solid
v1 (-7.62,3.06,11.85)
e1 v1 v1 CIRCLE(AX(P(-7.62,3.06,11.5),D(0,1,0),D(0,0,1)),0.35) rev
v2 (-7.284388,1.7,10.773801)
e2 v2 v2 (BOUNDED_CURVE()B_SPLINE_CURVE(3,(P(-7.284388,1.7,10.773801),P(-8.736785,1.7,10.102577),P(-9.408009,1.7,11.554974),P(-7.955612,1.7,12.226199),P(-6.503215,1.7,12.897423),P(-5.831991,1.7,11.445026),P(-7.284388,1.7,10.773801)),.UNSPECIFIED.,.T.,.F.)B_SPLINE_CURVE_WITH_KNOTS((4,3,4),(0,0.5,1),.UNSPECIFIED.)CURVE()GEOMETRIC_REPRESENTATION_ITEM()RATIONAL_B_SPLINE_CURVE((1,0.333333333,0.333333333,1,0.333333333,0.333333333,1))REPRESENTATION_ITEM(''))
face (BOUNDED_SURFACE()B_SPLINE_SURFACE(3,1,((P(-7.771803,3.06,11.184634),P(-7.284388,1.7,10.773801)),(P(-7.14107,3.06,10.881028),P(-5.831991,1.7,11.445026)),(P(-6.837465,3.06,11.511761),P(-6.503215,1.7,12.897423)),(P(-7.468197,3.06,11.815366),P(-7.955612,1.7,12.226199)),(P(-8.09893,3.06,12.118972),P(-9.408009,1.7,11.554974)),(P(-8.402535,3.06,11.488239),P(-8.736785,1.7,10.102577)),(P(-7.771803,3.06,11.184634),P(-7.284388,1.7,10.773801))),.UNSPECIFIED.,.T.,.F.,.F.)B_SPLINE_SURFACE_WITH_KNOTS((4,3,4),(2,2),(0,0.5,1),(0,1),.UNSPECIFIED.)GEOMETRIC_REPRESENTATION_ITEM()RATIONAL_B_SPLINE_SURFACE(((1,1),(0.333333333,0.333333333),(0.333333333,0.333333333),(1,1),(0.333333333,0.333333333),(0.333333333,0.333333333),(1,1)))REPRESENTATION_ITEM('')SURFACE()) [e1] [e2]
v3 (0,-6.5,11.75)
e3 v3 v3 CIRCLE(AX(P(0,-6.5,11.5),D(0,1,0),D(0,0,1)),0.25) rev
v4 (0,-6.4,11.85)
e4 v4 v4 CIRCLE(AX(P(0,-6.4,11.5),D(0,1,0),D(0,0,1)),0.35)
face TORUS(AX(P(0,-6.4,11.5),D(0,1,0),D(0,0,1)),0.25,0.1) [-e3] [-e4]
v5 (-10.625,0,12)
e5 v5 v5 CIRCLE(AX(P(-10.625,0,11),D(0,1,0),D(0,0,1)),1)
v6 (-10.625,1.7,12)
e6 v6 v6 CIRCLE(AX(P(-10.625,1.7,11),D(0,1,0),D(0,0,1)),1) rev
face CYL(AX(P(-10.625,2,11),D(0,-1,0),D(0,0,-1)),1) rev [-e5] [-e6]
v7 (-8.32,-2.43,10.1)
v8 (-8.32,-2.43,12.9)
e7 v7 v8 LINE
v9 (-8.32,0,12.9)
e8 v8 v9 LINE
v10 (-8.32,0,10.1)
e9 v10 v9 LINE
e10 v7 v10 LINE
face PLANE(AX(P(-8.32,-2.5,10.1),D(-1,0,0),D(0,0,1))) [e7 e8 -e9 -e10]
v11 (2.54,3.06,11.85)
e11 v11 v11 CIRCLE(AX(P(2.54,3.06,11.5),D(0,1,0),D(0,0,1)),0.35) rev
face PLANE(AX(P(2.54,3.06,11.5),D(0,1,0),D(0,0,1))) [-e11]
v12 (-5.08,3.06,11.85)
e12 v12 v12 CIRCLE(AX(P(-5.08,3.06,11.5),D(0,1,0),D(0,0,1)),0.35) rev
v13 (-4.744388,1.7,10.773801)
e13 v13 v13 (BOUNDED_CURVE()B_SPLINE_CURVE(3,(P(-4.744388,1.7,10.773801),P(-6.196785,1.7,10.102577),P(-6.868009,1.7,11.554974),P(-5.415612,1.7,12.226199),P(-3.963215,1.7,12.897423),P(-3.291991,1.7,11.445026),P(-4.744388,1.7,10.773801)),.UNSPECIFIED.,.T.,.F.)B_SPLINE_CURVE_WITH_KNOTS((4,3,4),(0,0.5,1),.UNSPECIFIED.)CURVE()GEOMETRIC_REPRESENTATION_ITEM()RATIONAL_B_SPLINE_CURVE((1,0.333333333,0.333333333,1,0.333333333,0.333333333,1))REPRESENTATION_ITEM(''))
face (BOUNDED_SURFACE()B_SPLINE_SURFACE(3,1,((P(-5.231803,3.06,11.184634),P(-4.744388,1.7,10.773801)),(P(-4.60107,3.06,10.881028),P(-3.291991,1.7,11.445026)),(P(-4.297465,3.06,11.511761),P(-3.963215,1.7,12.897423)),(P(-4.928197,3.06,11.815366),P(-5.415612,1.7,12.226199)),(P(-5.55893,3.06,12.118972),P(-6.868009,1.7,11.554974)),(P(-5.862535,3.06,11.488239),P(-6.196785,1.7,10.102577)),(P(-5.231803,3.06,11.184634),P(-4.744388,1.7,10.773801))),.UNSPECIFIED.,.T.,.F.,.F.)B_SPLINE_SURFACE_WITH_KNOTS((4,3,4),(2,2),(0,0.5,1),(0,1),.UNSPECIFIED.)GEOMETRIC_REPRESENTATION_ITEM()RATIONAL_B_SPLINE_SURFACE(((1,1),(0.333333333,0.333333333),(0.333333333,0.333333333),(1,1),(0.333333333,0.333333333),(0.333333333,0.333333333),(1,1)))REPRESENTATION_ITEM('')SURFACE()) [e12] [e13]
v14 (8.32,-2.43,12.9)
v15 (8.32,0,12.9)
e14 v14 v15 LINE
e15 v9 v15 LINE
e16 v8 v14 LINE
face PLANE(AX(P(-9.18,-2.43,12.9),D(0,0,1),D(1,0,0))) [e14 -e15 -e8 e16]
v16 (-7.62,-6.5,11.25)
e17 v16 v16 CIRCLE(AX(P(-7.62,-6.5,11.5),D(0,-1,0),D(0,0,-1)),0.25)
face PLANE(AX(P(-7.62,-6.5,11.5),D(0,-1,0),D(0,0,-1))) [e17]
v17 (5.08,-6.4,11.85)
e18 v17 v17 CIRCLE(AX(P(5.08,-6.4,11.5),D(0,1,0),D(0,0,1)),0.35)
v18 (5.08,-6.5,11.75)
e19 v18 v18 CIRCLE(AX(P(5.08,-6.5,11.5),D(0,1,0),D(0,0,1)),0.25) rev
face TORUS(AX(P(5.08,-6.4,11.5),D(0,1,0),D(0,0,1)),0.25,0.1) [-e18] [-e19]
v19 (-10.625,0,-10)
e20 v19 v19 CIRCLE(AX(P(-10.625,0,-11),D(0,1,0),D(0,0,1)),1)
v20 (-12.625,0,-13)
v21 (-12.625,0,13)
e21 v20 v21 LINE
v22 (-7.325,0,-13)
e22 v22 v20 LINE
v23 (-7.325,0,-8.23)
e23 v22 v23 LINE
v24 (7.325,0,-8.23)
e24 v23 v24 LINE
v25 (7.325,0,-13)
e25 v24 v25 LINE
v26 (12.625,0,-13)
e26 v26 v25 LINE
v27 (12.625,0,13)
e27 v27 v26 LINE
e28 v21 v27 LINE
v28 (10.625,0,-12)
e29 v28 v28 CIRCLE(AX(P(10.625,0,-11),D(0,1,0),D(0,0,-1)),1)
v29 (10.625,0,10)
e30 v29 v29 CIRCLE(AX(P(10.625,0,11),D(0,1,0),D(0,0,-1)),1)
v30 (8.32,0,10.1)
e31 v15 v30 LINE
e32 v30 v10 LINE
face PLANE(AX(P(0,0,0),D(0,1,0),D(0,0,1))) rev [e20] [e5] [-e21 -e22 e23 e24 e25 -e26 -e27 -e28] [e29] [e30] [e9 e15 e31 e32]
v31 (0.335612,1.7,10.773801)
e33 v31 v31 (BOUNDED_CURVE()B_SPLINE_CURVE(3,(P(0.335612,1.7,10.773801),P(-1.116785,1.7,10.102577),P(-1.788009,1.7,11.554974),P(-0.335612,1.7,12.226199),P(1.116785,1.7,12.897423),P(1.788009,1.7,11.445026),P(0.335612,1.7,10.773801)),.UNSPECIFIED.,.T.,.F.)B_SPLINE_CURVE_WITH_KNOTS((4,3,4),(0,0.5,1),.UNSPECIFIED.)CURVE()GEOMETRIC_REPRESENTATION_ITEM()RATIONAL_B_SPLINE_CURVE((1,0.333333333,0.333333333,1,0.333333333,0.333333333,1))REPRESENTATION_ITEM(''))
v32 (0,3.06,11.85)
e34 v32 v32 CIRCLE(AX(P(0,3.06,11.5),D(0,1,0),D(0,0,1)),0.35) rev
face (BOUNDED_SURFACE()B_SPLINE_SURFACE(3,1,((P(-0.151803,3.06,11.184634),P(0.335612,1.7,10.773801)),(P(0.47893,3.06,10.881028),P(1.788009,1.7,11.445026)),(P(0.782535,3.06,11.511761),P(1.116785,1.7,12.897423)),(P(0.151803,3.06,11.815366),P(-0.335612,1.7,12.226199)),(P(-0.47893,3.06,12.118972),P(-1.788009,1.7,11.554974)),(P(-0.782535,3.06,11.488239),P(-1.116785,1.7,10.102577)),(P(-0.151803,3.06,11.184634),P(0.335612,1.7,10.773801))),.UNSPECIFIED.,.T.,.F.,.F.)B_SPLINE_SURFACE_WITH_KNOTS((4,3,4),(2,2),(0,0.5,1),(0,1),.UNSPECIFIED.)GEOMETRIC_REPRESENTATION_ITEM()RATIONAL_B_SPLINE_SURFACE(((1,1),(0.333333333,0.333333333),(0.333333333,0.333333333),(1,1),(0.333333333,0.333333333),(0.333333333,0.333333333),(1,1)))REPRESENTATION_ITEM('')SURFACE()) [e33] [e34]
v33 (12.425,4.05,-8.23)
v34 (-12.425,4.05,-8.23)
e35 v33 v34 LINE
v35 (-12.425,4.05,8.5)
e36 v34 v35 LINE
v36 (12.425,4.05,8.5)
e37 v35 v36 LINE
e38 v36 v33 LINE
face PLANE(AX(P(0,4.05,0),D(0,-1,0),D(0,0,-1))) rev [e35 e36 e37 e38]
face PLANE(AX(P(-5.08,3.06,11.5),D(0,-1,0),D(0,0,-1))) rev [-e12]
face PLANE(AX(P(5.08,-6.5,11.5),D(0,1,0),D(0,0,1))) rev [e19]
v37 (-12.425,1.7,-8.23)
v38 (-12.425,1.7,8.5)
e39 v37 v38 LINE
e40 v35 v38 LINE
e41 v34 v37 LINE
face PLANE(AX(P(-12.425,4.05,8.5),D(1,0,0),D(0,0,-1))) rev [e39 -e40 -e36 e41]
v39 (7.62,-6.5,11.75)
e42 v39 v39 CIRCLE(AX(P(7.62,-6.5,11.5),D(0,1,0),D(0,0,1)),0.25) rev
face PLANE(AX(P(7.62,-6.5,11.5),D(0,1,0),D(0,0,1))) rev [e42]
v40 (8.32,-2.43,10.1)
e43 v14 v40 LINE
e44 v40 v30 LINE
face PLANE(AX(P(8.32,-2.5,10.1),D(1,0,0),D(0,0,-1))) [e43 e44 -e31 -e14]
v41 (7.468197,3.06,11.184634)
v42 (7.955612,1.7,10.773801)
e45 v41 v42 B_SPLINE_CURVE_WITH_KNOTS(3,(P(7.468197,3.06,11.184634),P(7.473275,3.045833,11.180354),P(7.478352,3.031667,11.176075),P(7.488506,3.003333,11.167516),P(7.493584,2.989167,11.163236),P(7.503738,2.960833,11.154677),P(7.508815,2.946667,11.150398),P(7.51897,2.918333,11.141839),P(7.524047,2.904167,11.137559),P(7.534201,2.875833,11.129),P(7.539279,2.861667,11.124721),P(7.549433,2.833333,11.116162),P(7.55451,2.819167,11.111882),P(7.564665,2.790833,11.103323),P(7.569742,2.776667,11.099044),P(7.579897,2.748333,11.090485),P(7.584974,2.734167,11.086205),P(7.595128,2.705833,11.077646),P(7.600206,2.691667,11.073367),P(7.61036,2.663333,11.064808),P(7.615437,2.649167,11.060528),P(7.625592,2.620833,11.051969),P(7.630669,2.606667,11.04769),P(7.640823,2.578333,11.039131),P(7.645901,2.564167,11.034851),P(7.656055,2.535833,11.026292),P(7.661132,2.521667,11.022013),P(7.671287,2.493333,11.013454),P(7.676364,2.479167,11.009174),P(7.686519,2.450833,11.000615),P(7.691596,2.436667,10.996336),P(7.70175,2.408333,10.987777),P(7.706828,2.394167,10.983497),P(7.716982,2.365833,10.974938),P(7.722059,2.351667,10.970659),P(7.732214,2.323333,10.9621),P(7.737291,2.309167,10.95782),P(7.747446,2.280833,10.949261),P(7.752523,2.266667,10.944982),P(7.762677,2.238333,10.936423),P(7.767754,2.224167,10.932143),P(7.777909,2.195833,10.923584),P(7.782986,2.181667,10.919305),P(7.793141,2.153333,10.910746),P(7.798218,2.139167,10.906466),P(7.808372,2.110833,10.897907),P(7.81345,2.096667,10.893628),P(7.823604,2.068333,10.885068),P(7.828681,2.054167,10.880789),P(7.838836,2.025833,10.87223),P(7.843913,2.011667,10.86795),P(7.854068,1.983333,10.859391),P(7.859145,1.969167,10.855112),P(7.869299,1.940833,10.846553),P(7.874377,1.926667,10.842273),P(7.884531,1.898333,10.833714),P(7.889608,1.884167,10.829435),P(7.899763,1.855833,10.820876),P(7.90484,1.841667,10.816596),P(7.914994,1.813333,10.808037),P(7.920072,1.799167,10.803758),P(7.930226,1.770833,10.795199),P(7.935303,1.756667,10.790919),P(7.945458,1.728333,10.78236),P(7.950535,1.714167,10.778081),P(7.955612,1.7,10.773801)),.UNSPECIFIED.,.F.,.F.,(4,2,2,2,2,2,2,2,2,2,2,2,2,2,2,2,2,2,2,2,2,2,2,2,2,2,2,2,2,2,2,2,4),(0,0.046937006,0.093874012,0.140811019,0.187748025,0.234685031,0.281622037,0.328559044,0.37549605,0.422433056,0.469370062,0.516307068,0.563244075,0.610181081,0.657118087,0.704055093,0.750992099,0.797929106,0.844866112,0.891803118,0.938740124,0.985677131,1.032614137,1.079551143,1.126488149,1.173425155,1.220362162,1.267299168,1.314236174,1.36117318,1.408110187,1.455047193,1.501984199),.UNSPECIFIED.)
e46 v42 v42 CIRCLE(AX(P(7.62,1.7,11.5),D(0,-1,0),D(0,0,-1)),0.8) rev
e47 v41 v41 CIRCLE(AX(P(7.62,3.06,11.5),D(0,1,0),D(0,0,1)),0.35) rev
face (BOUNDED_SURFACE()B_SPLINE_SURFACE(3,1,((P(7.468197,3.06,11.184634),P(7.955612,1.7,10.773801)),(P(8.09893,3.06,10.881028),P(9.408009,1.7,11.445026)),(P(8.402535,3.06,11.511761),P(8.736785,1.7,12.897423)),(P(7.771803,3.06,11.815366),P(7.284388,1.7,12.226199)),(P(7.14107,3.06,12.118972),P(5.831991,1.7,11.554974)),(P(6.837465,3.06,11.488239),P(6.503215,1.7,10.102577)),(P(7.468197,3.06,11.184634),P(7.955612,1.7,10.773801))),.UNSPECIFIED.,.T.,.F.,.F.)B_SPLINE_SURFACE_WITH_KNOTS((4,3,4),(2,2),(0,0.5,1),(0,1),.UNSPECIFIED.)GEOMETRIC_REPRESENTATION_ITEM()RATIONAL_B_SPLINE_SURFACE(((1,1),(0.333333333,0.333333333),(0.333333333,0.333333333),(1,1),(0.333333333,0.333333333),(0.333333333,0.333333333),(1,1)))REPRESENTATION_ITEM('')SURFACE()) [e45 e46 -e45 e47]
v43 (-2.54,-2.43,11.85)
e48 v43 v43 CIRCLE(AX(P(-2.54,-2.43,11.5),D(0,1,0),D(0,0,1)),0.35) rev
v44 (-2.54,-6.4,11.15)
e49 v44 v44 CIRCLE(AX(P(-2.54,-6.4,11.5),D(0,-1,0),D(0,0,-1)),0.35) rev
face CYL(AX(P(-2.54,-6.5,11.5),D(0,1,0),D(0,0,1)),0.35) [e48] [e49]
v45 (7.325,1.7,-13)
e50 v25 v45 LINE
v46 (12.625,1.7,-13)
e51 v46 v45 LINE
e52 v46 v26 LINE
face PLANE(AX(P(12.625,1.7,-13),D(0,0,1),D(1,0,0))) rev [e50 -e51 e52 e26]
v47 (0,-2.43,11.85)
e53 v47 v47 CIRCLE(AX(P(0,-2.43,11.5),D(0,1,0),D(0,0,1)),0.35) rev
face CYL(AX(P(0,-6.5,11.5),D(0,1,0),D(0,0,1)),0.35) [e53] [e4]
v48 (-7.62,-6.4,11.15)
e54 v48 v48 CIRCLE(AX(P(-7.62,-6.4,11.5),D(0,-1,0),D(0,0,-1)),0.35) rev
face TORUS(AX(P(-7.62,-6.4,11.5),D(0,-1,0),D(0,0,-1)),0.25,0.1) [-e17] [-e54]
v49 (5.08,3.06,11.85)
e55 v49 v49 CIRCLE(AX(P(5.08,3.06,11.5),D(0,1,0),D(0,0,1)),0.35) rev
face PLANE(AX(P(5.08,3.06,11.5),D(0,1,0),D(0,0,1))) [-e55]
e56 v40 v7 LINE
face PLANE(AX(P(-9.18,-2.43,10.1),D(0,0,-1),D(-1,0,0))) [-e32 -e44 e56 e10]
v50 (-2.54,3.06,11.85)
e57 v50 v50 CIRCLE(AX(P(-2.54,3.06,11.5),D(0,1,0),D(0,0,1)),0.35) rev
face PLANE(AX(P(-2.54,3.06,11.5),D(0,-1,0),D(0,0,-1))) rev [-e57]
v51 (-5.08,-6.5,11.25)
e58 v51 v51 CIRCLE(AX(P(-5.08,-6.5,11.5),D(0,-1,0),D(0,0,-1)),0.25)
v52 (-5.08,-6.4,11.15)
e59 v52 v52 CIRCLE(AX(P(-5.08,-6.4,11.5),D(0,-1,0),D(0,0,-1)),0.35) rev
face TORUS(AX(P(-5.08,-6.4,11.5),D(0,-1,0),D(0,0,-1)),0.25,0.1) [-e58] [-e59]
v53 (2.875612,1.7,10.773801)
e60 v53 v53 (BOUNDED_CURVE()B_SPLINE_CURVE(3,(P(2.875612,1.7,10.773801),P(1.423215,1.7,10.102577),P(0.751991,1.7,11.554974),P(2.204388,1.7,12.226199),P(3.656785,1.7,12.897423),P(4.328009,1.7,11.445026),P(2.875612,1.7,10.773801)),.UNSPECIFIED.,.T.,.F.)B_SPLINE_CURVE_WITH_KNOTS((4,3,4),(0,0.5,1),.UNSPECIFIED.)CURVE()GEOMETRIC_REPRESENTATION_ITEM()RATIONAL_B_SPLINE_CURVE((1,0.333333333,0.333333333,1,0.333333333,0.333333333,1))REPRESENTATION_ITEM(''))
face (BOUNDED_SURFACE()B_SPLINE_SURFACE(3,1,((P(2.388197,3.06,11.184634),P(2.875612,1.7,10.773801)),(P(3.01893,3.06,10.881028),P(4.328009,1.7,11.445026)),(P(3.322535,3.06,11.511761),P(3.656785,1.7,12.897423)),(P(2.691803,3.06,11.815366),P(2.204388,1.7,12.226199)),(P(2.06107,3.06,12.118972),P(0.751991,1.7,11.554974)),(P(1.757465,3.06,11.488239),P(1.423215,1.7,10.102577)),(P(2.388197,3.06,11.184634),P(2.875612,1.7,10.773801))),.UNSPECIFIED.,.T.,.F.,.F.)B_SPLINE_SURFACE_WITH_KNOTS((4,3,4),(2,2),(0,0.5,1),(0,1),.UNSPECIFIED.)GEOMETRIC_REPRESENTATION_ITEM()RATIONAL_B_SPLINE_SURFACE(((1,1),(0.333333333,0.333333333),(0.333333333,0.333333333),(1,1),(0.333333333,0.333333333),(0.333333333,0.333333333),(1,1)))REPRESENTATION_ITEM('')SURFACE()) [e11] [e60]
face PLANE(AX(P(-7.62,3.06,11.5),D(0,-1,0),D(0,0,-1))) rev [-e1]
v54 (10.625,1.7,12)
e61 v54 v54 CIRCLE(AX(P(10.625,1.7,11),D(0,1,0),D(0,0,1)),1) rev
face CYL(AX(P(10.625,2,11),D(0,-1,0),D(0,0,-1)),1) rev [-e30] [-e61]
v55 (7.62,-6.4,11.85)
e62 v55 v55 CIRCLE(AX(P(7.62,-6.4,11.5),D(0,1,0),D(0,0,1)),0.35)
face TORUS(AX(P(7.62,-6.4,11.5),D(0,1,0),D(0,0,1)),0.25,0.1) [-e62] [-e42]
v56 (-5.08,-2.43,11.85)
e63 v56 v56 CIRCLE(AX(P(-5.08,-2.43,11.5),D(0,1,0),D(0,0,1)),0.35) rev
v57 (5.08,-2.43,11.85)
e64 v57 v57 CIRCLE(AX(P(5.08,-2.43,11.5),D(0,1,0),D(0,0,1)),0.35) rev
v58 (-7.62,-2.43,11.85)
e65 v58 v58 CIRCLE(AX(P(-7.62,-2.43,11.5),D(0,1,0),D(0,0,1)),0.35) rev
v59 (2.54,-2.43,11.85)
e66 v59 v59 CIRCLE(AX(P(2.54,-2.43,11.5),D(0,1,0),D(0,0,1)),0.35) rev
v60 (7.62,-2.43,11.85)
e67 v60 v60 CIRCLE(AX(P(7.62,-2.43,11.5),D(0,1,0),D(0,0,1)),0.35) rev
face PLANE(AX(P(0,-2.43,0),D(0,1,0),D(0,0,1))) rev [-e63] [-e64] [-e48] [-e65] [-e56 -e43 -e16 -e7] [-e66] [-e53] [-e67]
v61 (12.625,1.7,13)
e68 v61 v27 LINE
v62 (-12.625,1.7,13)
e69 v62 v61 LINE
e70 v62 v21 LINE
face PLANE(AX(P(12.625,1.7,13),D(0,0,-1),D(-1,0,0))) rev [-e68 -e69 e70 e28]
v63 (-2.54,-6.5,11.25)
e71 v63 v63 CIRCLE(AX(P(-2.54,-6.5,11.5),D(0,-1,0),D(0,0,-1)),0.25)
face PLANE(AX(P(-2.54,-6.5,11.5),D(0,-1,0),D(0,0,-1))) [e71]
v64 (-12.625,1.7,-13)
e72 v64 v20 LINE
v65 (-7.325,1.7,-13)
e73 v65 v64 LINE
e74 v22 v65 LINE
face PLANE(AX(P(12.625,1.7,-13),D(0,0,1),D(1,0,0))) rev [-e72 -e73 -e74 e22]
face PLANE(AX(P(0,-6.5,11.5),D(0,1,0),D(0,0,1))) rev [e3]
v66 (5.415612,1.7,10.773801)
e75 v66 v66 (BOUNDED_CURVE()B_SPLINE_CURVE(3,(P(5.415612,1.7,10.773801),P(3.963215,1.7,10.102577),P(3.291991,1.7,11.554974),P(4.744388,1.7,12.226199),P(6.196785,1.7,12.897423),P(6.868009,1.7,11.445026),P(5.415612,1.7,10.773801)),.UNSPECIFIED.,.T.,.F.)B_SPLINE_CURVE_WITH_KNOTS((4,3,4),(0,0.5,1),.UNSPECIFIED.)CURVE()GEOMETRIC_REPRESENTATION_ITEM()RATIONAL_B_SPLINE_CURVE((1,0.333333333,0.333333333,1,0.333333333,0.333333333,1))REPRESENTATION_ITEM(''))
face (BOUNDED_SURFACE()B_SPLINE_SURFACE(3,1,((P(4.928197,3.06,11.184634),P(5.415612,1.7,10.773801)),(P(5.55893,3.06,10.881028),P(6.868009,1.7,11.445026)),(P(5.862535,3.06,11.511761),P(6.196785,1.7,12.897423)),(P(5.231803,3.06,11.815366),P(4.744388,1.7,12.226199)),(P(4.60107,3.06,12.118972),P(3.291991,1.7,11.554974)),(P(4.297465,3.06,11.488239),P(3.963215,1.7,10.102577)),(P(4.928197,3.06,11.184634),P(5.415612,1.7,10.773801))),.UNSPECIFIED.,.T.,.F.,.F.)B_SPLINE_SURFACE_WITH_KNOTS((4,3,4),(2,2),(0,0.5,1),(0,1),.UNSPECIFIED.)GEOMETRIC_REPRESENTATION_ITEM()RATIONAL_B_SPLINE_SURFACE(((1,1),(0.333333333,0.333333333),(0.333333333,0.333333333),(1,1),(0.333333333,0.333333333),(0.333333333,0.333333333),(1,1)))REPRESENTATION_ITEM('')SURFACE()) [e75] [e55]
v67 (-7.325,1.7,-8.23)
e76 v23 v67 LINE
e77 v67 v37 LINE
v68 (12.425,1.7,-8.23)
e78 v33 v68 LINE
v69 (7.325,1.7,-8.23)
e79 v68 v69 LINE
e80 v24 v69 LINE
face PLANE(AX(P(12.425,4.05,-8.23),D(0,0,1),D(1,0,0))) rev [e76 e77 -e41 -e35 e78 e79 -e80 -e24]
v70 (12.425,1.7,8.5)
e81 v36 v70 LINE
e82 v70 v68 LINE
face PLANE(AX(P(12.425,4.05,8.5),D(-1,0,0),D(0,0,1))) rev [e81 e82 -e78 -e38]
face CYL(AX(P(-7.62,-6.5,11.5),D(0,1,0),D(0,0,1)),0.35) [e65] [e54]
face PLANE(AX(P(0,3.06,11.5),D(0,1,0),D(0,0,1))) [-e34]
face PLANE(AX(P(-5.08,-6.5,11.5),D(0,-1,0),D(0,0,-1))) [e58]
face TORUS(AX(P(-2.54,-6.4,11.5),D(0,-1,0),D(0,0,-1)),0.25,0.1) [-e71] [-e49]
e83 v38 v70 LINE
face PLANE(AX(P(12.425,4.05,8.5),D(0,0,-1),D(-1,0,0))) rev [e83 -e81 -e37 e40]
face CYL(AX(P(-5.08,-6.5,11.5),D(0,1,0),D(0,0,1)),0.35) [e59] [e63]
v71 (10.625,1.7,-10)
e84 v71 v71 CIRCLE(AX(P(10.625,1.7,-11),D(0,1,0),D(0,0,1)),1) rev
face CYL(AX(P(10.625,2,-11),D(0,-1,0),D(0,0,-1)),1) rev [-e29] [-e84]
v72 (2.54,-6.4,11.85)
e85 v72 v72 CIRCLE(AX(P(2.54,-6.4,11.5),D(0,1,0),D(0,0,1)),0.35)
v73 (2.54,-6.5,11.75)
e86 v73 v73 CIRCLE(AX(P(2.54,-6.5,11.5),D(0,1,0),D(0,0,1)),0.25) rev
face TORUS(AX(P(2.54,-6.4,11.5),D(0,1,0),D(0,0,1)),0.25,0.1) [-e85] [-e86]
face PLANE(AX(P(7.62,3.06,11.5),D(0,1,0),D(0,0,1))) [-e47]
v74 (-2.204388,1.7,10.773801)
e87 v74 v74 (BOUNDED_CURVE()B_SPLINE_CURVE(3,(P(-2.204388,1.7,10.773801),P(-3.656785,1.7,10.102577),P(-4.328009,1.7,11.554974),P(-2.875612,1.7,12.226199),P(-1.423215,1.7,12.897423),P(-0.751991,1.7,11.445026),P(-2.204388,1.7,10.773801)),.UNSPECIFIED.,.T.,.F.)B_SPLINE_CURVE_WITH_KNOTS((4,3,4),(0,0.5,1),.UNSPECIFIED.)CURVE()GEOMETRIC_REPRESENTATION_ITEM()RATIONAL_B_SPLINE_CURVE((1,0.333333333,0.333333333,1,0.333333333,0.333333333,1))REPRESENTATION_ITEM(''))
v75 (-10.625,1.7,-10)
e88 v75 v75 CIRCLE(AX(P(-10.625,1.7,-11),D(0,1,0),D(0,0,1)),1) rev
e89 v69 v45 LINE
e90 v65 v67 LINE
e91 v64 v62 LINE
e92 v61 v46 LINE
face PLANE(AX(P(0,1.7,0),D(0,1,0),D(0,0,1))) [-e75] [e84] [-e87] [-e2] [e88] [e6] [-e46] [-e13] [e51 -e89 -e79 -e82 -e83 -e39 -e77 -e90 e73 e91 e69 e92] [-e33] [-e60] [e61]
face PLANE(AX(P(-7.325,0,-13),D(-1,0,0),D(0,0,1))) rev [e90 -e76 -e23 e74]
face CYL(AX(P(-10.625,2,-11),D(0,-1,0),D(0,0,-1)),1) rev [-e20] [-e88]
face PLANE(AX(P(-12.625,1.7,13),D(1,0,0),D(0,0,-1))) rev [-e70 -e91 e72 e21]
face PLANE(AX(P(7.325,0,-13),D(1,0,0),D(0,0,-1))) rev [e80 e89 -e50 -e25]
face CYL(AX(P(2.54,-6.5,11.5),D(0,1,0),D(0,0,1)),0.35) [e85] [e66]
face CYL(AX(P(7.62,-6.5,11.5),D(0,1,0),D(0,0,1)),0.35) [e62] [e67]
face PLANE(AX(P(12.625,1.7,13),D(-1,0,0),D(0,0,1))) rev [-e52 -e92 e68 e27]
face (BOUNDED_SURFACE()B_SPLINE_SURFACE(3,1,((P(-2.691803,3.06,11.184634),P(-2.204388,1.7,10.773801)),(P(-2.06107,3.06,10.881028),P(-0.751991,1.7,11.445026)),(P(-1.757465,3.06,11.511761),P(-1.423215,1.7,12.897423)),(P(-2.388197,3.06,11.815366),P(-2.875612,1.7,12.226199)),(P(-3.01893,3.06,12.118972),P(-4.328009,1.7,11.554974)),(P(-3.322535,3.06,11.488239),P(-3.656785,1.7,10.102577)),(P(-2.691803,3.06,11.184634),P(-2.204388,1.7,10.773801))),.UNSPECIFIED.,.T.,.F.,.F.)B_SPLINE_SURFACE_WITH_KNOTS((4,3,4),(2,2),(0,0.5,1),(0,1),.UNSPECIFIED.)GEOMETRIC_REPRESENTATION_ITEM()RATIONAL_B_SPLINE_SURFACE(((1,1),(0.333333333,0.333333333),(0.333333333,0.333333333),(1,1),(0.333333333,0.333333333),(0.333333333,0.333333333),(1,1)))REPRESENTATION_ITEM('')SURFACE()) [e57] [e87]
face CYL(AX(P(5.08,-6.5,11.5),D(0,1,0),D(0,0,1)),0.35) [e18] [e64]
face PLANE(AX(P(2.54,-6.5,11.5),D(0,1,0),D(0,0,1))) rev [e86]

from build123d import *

# Parameters (mm, degrees)
SKETCH_1_W             = 25.25
SKETCH_1_H             = 26
EXTRUDE_1_DEPTH        = 1.7
SKETCH_3_R             = 1
CUT_EXTRUDE_3_DEPTH    = 2
SKETCH_7_W             = 24.85
SKETCH_7_H             = 16.73
EXTRUDE_4_DEPTH        = 2.35
SKETCH_9_W             = 14.65
SKETCH_9_H             = 4.77
CUT_EXTRUDE_5_DEPTH    = 1.7
EXTRUDE_5_DEPTH        = 1.36
EXTRUDE_5_DEPTH_BACK   = 8.2
SKETCH_10_R            = 0.35
PATTERN_LINEAR_1_COUNT = 7
PATTERN_LINEAR_1_PITCH = 2.54
SKETCH_13_W            = 18.36
SKETCH_13_H            = 2.8
EXTRUDE_6_DEPTH        = 2.43
FILLET_2_R             = 0.5
FILLET_3_R             = 0.1
SKETCH_14_W            = 0.86
SKETCH_14_H            = 2.8
CUT_EXTRUDE_6_DEPTH    = 2.5


with BuildPart() as part:
    # 草图1 → 凸台-拉伸1 (new body)
    with BuildSketch(Plane(origin=(0, 0, 0), x_dir=(1, 0, 0), z_dir=(0, 1, 0))):
        Rectangle(SKETCH_1_W, SKETCH_1_H)
    extrude(amount=EXTRUDE_1_DEPTH)

    # 草图3 → 切除-拉伸3 (cut)
    with BuildSketch(Plane(origin=(0, 0, 0), x_dir=(1, 0, 0), z_dir=(0, 1, 0))):
        with Locations(Location((-10.625, -11, 0), (0, 0, 270))):
            Circle(SKETCH_3_R)
        with Locations(Location((10.625, -11, 0), (0, 0, 90))):
            Circle(SKETCH_3_R)
        with Locations(Location((-10.625, 11, 0), (0, 0, 270))):
            Circle(SKETCH_3_R)
        with Locations(Location((10.625, 11, 0), (0, 0, 90))):
            Circle(SKETCH_3_R)
    extrude(amount=CUT_EXTRUDE_3_DEPTH, mode=Mode.SUBTRACT)

    # 草图7 → 凸台-拉伸4 (add)
    with BuildSketch(Plane(origin=(0, 1.7, 0), x_dir=(1, 0, 0), z_dir=(0, 1, 0))):
        with Locations((0, -0.135)):
            Rectangle(SKETCH_7_W, SKETCH_7_H)
    extrude(amount=EXTRUDE_4_DEPTH)

    # 草图9 → 切除-拉伸5 (cut)
    with BuildSketch(Plane(origin=(0, 1.7, 0), x_dir=(1, 0, 0), z_dir=(0, 1, 0))):
        with Locations((0, 10.615)):
            Rectangle(SKETCH_9_W, SKETCH_9_H)
    extrude(amount=-CUT_EXTRUDE_5_DEPTH, mode=Mode.SUBTRACT)

    # 草图10 → 凸台-拉伸5 (add, two sides: drawn at the far end of the back side and taken through both)
    with BuildSketch(Plane(origin=(0, 1.7, 0), x_dir=(1, 0, 0), z_dir=(0, 1, 0)).offset(-EXTRUDE_5_DEPTH_BACK)):
        with Locations(Location((0, -11.5, 0), (0, 0, 270))):
            Circle(SKETCH_10_R)
        with Locations(Location((2.54, -11.5, 0), (0, 0, 270))):
            Circle(SKETCH_10_R)
        with Locations(Location((5.08, -11.5, 0), (0, 0, 270))):
            Circle(SKETCH_10_R)
        with Locations(Location((7.62, -11.5, 0), (0, 0, 270))):
            Circle(SKETCH_10_R)
        with Locations(Location((-2.54, -11.5, 0), (0, 0, 270))):
            Circle(SKETCH_10_R)
        with Locations(Location((-5.08, -11.5, 0), (0, 0, 270))):
            Circle(SKETCH_10_R)
        with Locations(Location((-7.62, -11.5, 0), (0, 0, 270))):
            Circle(SKETCH_10_R)
    extrude(amount=EXTRUDE_5_DEPTH + EXTRUDE_5_DEPTH_BACK)

    # 放样2: read off the stored shape, not the designer's step
    # 放样2: loft between two sections, ruled curve by curve
    loft_2_from = [
        Edge.make_bspline([(7.468197303, 3.06, 11.18463364), (8.098930024, 3.06, 10.881028246), (8.402535418, 3.06, 11.511760967), (7.771802697, 3.06, 11.81536636), (7.141069976, 3.06, 12.118971754), (6.837464582, 3.06, 11.488239033), (7.468197303, 3.06, 11.18463364)], [0, 0, 0, 0, 0.5, 0.5, 0.5, 1, 1, 1, 1], 3, [1, 0.333333333, 0.333333333, 1, 0.333333333, 0.333333333, 1]),
    ]
    loft_2_to = [
        Edge.make_bspline([(7.955612365, 1.7, 10.773801446), (9.408009474, 1.7, 11.445026176), (8.736784744, 1.7, 12.897423284), (7.284387635, 1.7, 12.226198554), (5.831990526, 1.7, 11.554973824), (6.503215256, 1.7, 10.102576716), (7.955612365, 1.7, 10.773801446)], [0, 0, 0, 0, 0.5, 0.5, 0.5, 1, 1, 1, 1], 3, [1, 0.333333333, 0.333333333, 1, 0.333333333, 0.333333333, 1]),
    ]
    loft_2 = Solid(Shell([*[Face.make_surface_from_curves(loft_2_from[k], loft_2_to[k]) for k in range(1)], Face(Wire(loft_2_from)), Face(Wire(loft_2_to))]))
    add(loft_2)

    # 阵列(线性)1: 放样2 ×7
    with Locations(*[(-i * PATTERN_LINEAR_1_PITCH, 0, 0) for i in range(1, PATTERN_LINEAR_1_COUNT)]):
        add(loft_2)

    # 草图13 → 凸台-拉伸6 (add)
    with BuildSketch(Plane(origin=(0, 0, 0), x_dir=(1, 0, 0), z_dir=(0, 1, 0))):
        with Locations((0, -11.5)):
            Rectangle(SKETCH_13_W, SKETCH_13_H)
    extrude(amount=-EXTRUDE_6_DEPTH)

    # 圆角2
    fillet_2_edges = [part.edges().sort_by_distance(p)[0] for p in [
        (9.18, -1.215, 10.1),
        (9.18, -1.215, 12.9),
        (-9.18, -1.215, 12.9),
        (-9.18, -1.215, 10.1),
    ]]
    fillet(fillet_2_edges, radius=FILLET_2_R)

    # 圆角3
    fillet_3_edges = [part.edges().sort_by_distance(p)[0] for p in [
        (0, -6.5, 11.15),
        (2.54, -6.5, 11.15),
        (5.08, -6.5, 11.15),
        (7.62, -6.5, 11.15),
        (-2.54, -6.5, 11.15),
        (-5.08, -6.5, 11.15),
        (-7.62, -6.5, 11.15),
    ]]
    fillet(fillet_3_edges, radius=FILLET_3_R)

    # 草图14 → 切除-拉伸6 (cut)
    with BuildSketch(Plane.XZ):
        with Locations((-8.75, 11.5)):
            Rectangle(SKETCH_14_W, SKETCH_14_H)
        with Locations((8.75, 11.5)):
            Rectangle(SKETCH_14_W, SKETCH_14_H)
    extrude(amount=CUT_EXTRUDE_6_DEPTH, mode=Mode.SUBTRACT)


solid = part.part
